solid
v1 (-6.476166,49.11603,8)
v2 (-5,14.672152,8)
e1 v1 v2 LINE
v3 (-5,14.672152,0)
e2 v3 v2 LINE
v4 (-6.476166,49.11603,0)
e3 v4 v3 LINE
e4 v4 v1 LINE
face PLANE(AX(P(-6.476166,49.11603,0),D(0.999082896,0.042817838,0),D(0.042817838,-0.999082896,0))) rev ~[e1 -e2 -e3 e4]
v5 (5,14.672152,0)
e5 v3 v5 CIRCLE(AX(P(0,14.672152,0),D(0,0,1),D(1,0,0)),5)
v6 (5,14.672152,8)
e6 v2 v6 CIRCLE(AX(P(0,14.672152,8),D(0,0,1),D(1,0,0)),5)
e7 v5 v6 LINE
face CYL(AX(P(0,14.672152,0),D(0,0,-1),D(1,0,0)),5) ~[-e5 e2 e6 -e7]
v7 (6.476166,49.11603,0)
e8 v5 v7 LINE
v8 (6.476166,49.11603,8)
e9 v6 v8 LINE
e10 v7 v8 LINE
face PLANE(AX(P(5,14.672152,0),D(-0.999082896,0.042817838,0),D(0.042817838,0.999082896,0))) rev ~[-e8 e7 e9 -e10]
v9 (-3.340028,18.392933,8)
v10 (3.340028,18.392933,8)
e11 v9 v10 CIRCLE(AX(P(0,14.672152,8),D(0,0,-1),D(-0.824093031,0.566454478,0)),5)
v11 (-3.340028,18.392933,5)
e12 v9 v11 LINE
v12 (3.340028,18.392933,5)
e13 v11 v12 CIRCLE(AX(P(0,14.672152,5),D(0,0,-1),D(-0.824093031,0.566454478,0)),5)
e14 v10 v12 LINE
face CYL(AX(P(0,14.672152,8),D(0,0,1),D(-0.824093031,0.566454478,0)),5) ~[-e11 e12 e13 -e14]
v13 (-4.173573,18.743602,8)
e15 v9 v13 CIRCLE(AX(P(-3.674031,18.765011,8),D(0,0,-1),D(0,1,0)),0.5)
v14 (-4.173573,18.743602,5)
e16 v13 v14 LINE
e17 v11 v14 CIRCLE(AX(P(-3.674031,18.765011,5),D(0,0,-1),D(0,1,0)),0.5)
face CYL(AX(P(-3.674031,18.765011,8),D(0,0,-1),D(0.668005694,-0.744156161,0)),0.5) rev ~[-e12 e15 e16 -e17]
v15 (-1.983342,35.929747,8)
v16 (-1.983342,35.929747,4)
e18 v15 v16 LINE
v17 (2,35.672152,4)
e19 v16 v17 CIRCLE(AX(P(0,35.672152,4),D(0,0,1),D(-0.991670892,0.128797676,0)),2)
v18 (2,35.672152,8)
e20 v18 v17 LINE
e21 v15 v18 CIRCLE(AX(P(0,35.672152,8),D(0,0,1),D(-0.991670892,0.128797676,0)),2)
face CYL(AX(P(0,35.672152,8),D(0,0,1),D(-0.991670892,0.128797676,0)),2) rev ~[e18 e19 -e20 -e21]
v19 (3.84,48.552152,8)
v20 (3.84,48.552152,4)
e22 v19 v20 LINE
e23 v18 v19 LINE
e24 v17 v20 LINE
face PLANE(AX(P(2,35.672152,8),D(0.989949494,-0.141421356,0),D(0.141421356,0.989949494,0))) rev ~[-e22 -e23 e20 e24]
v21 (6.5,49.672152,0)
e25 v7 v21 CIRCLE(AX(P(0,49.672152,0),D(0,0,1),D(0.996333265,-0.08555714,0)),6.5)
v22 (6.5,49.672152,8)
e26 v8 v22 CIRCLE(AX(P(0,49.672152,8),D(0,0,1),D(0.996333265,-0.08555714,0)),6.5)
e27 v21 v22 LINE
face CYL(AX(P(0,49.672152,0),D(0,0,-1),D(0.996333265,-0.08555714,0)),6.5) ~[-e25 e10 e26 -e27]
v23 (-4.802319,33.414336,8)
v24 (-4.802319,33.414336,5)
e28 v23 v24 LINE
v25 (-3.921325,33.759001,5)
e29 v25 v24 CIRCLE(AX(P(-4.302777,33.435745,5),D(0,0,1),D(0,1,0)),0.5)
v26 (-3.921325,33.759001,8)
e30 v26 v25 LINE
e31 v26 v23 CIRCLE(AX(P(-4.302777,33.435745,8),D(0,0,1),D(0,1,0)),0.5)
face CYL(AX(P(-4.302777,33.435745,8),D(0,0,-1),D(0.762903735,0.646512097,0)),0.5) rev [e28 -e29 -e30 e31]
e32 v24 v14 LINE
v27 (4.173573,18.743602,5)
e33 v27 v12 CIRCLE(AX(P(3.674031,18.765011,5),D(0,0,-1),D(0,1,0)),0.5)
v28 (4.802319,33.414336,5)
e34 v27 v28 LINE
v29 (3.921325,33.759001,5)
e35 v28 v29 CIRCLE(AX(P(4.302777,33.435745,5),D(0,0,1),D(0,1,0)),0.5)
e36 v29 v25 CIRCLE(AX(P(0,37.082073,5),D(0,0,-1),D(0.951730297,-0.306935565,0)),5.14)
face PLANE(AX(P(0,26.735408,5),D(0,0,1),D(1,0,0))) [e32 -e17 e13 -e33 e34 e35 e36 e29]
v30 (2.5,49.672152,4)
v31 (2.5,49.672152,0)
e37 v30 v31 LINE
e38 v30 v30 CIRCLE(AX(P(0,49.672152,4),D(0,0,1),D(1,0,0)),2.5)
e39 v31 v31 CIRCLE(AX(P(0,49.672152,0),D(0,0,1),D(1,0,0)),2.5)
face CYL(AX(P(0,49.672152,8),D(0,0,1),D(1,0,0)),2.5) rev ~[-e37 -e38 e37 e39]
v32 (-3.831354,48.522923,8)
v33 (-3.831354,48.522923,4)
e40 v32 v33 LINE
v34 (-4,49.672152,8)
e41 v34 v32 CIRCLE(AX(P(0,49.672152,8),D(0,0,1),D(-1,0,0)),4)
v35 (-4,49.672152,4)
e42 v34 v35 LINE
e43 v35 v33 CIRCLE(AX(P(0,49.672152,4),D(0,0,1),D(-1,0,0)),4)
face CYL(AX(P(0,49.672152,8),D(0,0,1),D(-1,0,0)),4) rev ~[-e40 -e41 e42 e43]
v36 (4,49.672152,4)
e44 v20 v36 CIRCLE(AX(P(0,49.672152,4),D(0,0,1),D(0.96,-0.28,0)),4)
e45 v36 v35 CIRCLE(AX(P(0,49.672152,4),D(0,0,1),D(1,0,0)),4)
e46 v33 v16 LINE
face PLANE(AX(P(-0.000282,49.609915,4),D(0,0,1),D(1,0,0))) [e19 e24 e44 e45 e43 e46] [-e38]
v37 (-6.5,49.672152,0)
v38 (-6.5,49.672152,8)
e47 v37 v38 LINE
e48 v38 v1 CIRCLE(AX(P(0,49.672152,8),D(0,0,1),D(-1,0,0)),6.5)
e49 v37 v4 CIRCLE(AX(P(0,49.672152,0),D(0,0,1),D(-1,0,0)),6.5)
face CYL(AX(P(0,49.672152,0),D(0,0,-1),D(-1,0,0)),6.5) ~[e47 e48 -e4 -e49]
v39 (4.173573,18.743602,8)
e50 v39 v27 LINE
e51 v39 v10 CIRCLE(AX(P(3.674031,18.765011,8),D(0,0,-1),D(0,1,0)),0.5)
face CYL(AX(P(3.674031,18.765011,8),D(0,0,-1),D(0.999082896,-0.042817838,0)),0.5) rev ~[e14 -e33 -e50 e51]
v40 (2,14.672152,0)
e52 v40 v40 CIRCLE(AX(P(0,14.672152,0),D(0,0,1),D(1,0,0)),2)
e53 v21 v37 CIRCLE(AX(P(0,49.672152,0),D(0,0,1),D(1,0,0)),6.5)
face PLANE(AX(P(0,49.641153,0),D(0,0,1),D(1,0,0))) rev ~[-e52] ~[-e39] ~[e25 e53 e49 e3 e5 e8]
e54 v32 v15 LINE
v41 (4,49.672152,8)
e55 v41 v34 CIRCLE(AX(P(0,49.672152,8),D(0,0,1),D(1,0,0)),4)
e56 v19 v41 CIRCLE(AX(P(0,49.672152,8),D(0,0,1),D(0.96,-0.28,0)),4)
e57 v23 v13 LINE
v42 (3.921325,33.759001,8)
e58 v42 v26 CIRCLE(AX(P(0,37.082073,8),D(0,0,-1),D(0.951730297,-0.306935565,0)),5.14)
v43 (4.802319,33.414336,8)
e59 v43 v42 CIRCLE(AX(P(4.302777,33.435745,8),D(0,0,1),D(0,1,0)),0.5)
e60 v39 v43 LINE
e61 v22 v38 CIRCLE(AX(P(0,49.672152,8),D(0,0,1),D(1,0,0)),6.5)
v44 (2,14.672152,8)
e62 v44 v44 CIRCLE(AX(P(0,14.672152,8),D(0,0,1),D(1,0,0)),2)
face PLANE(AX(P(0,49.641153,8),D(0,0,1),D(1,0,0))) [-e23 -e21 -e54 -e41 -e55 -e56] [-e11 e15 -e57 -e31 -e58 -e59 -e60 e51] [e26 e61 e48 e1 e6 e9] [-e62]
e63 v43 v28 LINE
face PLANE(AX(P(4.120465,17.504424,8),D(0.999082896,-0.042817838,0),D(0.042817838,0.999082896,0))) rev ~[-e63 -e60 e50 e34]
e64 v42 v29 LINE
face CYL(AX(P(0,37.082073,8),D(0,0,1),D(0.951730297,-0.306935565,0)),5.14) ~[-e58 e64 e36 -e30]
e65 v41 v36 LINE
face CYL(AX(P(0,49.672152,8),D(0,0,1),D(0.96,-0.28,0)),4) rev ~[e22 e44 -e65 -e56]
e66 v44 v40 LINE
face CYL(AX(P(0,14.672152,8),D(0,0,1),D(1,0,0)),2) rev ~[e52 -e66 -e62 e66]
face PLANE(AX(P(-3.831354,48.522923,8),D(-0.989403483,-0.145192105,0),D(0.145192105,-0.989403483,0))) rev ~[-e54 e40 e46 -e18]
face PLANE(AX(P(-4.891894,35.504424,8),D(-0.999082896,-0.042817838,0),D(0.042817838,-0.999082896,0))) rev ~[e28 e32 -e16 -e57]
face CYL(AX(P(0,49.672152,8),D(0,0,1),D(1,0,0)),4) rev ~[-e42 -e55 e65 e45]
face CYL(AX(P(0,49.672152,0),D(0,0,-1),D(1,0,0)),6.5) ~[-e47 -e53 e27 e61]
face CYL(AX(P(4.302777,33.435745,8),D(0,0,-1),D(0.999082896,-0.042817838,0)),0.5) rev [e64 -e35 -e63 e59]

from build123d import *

# Parameters (mm, degrees)
F1_DEPTH = 8
F2_R     = 2.5
F2_R_2   = 2
F3_DEPTH = 25
F5_DEPTH = 4
F7_DEPTH = 3
F8_R     = 0.5
F9_R     = 0.5


# Not quite as in the source:
# - a feature names something its author has since deleted; it is built from what else it names


with BuildPart() as f1:
    # F0 (on Top) → F1 (new body)
    with BuildSketch(Plane.XY):
        with BuildLine():
            Line((6.4761662253, 49.1160303571), (6.5, 49.6721517667))
            ThreePointArc((6.5, 49.6721517667), (0, 56.1721517667), (-6.5, 49.6721517667))
            Line((-6.5, 49.6721517667), (-6.4761662253, 49.1160303571))
            ThreePointArc((-6.4761662253, 49.1160303571), (0, 43.1721517667), (6.4761662253, 49.1160303571))
        make_face()
        with BuildLine():
            ThreePointArc((6.4761662253, 49.1160303571), (6.4940388228, 49.3938358172), (6.5, 49.6721517667))
            Line((6.5, 49.6721517667), (6.4761662253, 49.1160303571))
        make_face()
        with BuildLine():
            Line((-6.4761662253, 49.1160303571), (-6.5, 49.6721517667))
            ThreePointArc((-6.5, 49.6721517667), (-6.4940388228, 49.3938358172), (-6.4761662253, 49.1160303571))
        make_face()
        with BuildLine():
            Line((5, 14.6721517667), (6.4761662253, 49.1160303571))
            ThreePointArc((6.4761662253, 49.1160303571), (0, 43.1721517667), (-6.4761662253, 49.1160303571))
            Line((-6.4761662253, 49.1160303571), (-5, 14.6721517667))
            ThreePointArc((-5, 14.6721517667), (0, 19.6721517667), (5, 14.6721517667))
        make_face()
        with BuildLine():
            ThreePointArc((-5, 14.6721517667), (0, 9.6721517667), (5, 14.6721517667))
            ThreePointArc((5, 14.6721517667), (0, 19.6721517667), (-5, 14.6721517667))
        make_face()
    extrude(amount=F1_DEPTH)

    # F2 (on face) → F3 (cut)
    with BuildSketch(Plane.XY.offset(8)):
        with Locations((0, 49.6721517667)):
            Circle(F2_R)
        with Locations((0, 14.6721517667)):
            Circle(F2_R_2)
    extrude(amount=-F3_DEPTH, mode=Mode.SUBTRACT)

    # F4 (on face) → F5 (cut)
    with BuildSketch(Plane.XY.offset(8)):
        with BuildLine():
            Line((3.84, 48.5521517667), (4, 49.6721517667))
            ThreePointArc((4, 49.6721517667), (0, 53.6721517667), (-4, 49.6721517667))
            Line((-4, 49.6721517667), (-3.8313540205, 48.522923169))
            ThreePointArc((-3.8313540205, 48.522923169), (0.0152402747, 45.6721808001), (3.84, 48.5521517667))
        make_face()
        with BuildLine():
            ThreePointArc((3.84, 48.5521517667), (3.9597979746, 49.1064663418), (4, 49.6721517667))
            Line((4, 49.6721517667), (3.84, 48.5521517667))
        make_face()
        with BuildLine():
            Line((-3.8313540205, 48.522923169), (-4, 49.6721517667))
            ThreePointArc((-4, 49.6721517667), (-3.9576139328, 49.0913833455), (-3.8313540205, 48.522923169))
        make_face()
        with BuildLine():
            Line((2, 35.6721517667), (3.84, 48.5521517667))
            ThreePointArc((3.84, 48.5521517667), (0.0152402747, 45.6721808001), (-3.8313540205, 48.522923169))
            Line((-3.8313540205, 48.522923169), (-1.9833417846, 35.929747119))
            ThreePointArc((-1.9833417846, 35.929747119), (0.1290667091, 37.6679828679), (2, 35.6721517667))
        make_face()
        with BuildLine():
            ThreePointArc((-1.9833417846, 35.929747119), (-0.1290667091, 33.6763206655), (2, 35.6721517667))
            ThreePointArc((2, 35.6721517667), (0.1290667091, 37.6679828679), (-1.9833417846, 35.929747119))
        make_face()
    extrude(amount=-F5_DEPTH, mode=Mode.SUBTRACT)

    # F6 (on face) → F7 (cut)
    with BuildSketch(Plane.XY.offset(8)):
        with BuildLine():
            ThreePointArc((-4.1204651564, 17.5044241573), (0, 19.6721517667), (4.1204651564, 17.5044241573))
            Line((4.1204651564, 17.5044241573), (4.8918937278, 35.5044241573))
            ThreePointArc((4.8918937278, 35.5044241573), (0, 31.9420729635), (-4.8918937278, 35.5044241573))
            Line((-4.8918937278, 35.5044241573), (-4.1204651564, 17.5044241573))
        make_face()
    extrude(amount=-F7_DEPTH, mode=Mode.SUBTRACT)

    # F8
    f8_edges = [f1.edges().sort_by_distance(p)[0] for p in [
        (4.891894, 35.504424, 6.5),
    ]]
    fillet(f8_edges, radius=F8_R)

    # F9
    f9_edges = [f1.edges().sort_by_distance(p)[0] for p in [
        (-4.891894, 35.504424, 6.5),
        (4.120465, 17.504424, 6.5),
        (-4.120465, 17.504424, 6.5),
    ]]
    fillet(f9_edges, radius=F9_R)


solid = f1.part
